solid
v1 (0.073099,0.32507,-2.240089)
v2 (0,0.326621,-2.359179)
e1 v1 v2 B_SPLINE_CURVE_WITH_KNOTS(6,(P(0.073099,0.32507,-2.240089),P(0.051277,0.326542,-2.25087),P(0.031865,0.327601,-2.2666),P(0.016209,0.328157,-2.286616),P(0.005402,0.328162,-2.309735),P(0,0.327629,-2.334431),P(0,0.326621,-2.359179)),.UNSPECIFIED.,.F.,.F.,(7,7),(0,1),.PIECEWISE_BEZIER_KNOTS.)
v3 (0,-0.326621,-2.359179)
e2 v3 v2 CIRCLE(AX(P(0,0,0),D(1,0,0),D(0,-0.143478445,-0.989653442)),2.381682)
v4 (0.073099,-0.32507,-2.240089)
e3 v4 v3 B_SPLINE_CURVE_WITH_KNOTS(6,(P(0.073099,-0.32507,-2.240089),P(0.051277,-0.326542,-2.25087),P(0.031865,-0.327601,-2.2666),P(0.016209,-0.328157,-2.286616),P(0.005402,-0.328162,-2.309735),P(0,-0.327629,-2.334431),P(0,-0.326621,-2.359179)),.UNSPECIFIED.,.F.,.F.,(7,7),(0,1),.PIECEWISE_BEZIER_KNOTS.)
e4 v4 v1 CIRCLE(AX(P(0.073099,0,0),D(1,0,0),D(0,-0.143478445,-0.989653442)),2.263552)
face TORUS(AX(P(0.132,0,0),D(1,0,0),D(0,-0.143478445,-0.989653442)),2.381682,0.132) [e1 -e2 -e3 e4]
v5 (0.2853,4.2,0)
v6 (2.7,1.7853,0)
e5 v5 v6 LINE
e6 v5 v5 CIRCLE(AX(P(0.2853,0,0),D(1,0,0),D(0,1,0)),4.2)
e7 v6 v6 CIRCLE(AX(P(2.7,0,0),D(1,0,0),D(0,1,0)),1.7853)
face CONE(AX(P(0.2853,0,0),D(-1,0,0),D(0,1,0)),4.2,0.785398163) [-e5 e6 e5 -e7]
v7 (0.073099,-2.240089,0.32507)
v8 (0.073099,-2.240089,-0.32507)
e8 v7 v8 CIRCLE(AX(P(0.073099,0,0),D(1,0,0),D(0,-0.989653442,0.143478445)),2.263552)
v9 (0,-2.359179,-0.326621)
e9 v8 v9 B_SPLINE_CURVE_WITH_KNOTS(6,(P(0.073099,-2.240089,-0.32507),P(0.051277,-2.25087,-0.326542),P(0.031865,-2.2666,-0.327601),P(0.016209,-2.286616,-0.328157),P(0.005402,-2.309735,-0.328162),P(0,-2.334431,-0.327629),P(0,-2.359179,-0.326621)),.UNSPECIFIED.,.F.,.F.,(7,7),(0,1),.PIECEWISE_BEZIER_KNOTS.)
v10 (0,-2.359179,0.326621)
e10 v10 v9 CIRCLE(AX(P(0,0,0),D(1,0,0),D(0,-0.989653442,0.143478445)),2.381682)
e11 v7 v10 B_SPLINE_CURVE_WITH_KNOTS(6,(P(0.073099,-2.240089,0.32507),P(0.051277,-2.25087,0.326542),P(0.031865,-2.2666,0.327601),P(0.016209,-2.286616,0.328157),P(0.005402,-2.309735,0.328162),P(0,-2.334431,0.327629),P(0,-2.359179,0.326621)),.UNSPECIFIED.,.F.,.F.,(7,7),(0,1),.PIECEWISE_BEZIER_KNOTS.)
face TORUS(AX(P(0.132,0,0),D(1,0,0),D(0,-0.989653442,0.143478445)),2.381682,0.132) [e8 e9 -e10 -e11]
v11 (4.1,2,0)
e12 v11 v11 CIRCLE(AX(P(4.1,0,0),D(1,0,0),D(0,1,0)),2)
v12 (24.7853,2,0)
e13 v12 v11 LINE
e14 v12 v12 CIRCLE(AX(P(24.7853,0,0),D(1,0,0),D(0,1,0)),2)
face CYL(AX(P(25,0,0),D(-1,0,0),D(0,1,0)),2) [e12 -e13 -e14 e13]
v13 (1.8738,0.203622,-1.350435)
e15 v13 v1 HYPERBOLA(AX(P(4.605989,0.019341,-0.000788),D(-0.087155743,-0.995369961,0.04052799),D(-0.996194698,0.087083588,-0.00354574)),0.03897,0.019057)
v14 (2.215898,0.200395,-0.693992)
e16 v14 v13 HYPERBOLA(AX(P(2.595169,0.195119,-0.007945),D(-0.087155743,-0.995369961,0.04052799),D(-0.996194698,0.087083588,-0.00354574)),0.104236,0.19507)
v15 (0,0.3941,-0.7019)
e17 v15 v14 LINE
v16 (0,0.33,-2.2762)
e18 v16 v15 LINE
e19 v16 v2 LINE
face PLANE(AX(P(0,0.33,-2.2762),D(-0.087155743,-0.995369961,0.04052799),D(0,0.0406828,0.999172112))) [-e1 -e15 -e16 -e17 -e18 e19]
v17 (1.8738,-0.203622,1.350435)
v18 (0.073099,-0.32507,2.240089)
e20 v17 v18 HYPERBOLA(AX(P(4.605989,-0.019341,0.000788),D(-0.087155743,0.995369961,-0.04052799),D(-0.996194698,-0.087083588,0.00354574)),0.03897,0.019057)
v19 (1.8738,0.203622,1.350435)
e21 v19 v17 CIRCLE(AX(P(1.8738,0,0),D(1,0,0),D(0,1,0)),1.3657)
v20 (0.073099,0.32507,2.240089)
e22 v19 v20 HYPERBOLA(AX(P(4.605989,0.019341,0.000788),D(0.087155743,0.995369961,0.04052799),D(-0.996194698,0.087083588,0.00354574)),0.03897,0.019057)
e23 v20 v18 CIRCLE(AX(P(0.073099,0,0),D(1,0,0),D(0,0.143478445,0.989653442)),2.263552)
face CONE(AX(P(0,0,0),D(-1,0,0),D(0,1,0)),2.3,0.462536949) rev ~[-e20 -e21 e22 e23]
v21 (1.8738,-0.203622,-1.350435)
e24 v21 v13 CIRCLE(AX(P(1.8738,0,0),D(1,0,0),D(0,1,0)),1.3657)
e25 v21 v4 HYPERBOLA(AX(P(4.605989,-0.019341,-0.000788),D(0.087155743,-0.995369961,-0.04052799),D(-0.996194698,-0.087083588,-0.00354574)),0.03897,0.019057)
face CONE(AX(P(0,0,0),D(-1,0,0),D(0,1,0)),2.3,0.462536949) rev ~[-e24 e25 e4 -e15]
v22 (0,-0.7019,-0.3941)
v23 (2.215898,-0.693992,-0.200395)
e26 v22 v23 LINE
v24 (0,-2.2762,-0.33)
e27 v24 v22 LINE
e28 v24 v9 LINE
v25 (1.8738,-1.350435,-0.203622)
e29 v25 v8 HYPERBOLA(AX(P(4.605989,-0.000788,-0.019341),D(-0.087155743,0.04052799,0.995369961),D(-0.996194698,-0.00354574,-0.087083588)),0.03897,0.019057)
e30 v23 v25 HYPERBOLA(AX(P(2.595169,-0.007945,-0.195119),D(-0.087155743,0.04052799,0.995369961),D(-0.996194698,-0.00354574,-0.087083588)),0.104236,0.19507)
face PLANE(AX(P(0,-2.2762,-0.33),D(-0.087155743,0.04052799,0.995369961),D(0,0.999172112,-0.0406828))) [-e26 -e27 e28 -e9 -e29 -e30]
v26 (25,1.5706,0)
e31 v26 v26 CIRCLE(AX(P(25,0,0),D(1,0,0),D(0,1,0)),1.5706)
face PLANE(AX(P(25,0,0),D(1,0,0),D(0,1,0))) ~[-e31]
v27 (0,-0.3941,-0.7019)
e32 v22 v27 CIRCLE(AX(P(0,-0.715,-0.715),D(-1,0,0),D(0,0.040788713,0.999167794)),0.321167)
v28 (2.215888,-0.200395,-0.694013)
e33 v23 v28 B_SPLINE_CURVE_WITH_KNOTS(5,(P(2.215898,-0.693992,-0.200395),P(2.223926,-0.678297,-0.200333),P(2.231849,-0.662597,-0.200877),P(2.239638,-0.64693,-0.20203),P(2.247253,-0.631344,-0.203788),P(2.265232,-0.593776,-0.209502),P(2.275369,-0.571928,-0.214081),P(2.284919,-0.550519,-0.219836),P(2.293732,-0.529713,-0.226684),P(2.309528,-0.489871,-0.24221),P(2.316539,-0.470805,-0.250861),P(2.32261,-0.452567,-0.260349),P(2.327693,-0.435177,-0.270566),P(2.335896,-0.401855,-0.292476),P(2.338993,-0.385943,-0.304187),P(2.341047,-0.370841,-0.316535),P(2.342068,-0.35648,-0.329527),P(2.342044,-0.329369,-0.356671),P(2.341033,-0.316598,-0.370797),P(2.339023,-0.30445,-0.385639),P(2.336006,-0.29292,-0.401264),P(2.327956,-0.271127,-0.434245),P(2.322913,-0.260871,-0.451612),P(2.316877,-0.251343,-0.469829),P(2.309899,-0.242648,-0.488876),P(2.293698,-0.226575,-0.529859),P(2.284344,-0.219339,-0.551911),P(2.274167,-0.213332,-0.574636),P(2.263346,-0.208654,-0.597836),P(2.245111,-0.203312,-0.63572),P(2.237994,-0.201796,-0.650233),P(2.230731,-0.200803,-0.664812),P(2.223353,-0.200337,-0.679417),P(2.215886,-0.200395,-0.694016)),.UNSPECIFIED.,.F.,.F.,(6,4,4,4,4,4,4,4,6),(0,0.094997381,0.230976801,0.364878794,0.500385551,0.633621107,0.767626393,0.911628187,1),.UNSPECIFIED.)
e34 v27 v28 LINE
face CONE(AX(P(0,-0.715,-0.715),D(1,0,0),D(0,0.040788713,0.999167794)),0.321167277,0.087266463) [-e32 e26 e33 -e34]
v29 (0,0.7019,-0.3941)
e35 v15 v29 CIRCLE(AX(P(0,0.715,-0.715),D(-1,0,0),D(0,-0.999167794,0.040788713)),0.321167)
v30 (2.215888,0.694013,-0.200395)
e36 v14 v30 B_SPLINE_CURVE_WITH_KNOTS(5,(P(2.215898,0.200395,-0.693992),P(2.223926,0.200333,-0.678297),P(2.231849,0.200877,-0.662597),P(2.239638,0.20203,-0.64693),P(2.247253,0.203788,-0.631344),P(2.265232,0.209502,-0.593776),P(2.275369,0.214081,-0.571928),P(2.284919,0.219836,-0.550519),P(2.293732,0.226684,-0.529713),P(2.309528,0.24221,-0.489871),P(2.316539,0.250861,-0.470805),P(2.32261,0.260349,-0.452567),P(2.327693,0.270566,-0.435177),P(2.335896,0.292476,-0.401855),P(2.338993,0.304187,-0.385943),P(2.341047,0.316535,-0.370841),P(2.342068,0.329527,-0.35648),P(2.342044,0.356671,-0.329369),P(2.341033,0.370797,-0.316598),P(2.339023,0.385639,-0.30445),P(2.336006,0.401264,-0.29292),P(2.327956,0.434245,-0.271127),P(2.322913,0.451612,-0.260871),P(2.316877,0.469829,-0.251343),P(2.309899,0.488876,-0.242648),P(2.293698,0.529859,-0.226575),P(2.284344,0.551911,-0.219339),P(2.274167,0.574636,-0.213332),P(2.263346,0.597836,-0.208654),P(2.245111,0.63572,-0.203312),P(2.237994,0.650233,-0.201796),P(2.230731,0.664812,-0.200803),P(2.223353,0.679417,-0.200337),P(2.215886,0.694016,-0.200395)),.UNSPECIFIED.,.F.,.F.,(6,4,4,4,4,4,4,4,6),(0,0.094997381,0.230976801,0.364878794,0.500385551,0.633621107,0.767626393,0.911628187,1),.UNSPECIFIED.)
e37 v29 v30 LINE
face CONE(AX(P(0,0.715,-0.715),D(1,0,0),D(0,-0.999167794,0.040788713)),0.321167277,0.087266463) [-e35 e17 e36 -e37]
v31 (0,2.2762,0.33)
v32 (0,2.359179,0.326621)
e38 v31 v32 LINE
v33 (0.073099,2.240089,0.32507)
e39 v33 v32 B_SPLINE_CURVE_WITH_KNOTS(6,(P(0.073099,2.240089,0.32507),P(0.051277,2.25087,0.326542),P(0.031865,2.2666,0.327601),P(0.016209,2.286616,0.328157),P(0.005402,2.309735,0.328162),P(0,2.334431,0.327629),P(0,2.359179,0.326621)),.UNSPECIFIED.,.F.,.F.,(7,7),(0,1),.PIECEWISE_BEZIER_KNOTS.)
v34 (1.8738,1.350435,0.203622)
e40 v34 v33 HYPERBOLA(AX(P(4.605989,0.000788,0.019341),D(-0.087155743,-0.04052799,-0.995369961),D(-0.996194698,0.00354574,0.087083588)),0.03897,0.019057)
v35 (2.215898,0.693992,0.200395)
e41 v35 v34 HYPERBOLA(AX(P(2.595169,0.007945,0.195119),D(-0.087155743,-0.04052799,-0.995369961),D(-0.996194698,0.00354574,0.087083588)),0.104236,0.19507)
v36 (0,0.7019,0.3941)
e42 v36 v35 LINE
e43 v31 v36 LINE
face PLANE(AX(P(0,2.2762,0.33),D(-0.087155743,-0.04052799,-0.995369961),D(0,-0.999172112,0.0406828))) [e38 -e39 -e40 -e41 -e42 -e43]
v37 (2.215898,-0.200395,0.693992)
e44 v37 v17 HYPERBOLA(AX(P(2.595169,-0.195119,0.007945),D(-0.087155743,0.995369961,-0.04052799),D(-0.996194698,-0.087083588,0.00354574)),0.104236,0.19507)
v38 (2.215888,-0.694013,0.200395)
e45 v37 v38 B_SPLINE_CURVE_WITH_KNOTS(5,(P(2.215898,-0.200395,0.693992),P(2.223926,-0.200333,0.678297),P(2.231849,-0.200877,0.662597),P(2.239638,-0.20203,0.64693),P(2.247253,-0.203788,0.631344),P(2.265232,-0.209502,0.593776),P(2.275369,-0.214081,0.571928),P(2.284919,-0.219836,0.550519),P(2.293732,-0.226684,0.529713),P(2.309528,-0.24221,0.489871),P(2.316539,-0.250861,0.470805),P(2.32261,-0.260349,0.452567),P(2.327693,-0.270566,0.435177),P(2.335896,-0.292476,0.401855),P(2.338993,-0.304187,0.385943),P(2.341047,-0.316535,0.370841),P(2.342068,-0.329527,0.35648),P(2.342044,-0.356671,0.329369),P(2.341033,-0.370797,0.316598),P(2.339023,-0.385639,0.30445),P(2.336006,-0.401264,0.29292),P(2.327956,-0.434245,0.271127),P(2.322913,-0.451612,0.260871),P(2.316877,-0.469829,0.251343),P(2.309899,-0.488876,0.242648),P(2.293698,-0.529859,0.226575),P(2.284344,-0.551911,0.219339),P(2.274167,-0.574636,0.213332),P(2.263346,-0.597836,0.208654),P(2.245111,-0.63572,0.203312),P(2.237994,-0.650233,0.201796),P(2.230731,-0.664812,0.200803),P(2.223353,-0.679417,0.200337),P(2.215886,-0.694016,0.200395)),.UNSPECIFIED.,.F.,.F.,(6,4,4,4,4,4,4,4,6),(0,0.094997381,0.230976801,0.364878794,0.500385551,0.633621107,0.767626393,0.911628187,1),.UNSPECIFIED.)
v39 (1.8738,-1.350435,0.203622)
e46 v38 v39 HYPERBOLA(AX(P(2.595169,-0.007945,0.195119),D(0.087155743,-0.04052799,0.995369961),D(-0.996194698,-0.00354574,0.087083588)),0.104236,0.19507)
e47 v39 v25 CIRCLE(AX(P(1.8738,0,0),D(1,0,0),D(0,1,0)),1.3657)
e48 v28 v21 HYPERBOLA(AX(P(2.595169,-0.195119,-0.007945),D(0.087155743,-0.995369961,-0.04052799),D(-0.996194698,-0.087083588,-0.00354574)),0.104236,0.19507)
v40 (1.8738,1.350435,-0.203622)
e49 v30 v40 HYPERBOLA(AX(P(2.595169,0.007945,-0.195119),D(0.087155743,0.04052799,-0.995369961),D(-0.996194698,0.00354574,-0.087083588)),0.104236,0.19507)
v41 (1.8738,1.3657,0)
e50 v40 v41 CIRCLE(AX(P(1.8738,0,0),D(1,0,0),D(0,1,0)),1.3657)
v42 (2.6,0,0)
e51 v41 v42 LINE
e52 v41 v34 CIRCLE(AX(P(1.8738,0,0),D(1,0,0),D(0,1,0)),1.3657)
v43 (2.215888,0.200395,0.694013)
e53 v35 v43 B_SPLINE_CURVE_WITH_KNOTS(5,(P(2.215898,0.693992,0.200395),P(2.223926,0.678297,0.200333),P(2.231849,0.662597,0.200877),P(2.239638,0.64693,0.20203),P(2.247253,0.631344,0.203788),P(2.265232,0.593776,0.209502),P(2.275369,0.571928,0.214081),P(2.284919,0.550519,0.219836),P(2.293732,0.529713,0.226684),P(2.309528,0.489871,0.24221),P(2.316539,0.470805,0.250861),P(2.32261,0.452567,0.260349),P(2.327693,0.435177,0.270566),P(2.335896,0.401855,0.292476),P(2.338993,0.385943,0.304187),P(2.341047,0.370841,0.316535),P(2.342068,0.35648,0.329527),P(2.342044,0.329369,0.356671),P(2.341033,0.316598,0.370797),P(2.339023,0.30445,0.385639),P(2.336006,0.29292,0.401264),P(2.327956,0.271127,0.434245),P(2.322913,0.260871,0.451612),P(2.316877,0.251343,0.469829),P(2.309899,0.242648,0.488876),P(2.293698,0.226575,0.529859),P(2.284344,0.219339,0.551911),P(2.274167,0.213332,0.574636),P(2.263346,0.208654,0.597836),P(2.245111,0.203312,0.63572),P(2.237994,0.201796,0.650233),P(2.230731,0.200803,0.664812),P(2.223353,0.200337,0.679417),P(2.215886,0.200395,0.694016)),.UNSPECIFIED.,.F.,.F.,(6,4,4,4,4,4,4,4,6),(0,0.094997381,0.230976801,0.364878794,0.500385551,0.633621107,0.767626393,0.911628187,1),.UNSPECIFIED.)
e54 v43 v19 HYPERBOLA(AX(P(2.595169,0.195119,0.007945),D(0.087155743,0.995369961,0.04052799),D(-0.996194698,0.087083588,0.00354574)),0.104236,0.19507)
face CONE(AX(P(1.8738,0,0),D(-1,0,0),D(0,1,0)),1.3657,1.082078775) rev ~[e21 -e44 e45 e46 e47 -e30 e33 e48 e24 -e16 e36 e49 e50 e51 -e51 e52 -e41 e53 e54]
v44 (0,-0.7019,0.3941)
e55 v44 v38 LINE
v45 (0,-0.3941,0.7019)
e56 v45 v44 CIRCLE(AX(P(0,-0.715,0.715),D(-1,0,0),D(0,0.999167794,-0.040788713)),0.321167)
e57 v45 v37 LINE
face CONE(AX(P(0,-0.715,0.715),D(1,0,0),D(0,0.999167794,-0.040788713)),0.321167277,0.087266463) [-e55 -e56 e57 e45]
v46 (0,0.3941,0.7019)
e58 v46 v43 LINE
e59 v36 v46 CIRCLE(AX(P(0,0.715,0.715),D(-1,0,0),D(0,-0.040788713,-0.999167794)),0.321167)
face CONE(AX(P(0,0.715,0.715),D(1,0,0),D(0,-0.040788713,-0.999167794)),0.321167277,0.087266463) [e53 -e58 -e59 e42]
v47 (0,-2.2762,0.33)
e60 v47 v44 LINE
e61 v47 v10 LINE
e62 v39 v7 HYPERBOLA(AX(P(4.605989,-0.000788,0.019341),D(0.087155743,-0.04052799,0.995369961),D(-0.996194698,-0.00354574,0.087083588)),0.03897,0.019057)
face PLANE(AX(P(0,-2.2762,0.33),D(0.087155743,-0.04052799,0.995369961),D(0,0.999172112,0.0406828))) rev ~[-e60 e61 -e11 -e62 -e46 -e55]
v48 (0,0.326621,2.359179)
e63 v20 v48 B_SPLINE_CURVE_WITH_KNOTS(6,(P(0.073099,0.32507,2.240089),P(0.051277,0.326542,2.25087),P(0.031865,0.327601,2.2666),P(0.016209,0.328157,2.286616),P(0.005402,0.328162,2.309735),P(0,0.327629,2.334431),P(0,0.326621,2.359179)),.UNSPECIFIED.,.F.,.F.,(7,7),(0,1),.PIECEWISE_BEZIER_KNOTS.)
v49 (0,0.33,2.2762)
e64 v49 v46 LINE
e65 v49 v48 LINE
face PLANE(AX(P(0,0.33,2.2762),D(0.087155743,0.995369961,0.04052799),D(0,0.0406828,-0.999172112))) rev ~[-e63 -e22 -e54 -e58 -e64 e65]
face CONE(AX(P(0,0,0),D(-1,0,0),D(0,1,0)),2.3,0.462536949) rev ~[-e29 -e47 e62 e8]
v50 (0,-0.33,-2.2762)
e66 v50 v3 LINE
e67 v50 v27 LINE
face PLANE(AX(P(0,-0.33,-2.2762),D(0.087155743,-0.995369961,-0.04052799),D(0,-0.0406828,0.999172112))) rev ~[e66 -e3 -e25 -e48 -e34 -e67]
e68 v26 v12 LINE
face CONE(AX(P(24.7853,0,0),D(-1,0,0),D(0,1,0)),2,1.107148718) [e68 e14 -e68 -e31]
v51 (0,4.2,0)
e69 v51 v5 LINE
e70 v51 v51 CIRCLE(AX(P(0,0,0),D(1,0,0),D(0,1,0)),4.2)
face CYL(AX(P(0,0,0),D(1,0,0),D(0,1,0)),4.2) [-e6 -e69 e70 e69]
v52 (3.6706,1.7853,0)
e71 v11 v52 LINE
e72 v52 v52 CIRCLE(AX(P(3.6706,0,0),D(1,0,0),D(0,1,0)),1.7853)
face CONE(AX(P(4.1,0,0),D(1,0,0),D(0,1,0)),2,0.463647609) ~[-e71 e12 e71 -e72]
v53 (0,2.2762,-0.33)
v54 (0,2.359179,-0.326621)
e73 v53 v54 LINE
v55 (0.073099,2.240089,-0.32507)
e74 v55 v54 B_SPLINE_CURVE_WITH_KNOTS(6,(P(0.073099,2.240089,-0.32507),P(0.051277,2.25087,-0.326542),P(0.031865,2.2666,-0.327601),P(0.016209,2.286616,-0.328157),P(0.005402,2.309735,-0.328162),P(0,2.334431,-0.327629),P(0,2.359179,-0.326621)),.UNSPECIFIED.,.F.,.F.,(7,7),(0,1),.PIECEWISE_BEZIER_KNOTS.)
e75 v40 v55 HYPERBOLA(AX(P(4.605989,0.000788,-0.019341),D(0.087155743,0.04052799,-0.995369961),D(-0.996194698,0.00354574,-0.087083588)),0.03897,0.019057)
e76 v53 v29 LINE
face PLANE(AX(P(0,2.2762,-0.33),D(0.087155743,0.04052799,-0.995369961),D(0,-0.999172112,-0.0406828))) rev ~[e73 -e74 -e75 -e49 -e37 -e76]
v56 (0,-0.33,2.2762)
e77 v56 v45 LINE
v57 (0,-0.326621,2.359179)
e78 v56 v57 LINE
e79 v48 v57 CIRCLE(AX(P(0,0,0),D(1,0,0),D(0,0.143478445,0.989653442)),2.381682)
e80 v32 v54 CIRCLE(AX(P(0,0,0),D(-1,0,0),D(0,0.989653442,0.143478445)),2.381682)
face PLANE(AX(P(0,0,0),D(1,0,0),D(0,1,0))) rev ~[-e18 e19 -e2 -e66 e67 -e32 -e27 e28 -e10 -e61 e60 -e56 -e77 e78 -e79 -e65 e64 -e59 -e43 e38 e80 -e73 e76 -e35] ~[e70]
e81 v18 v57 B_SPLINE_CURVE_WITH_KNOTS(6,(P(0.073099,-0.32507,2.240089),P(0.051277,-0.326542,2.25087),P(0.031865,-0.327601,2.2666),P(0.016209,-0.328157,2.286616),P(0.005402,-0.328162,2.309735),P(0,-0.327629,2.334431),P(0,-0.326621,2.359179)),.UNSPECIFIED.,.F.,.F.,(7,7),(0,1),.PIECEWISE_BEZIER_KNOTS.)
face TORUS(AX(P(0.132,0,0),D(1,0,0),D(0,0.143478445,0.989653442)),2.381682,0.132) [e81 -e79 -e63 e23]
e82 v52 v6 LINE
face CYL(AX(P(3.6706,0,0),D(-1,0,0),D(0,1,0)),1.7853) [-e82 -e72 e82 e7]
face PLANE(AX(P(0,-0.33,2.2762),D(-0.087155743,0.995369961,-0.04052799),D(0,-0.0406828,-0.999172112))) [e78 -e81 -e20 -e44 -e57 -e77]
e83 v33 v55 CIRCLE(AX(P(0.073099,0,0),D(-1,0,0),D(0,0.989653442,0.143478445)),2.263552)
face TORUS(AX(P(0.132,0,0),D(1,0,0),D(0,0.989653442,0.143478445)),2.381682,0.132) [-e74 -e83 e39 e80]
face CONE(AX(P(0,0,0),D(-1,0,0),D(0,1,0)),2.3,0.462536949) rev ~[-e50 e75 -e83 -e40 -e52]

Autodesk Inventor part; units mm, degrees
ref_plane "YZ Plane" through (0, 0, 0) normal (1, 0, 0) x (0, 1, 0)
ref_plane "XZ Plane" through (0, 0, 0) normal (0, 1, 0) x (-1, 0, 0)
sketch "Sketch1" plane through (0, 0, 0) normal (0, 0, 1) x (1, 0, 0)
  line L0 (2.6, 0) -> (25, 0)
  line L1 (25, 0) -> (25, 2)
  line L2 (25, 2) -> (4.1, 2)
  line L3 (4.1, 2) -> (3.6706, 1.7853)
  line L4 (3.6706, 1.7853) -> (2.7, 1.7853)
  line L5 (0, 4.2) -> (0, 2.3)
  line L6 (0, 2.3) -> (1.8738, 1.3657)
  line L7 (1.8738, 1.3657) -> (2.6, 0)
  line L8 (-5, 0) -> (30, 0) projected
  line L9 (0, -0.84) -> (0, 5.04) projected
  line L10 (0, 4.2) -> (0.2853, 4.2)
  line L11 (0.2853, 4.2) -> (2.7, 1.7853)
  line L12 (4.1, 2) -> (2.4853, 2) construction
  dimension "d1" = 20.9
  dimension "d2" = 4
  dimension "d3" = 3.5706
  dimension "d4" = 4.6
  dimension "d5" = 26.5
  dimension "d6" = 62
  dimension "d7" = 2.6
  dimension "d8" = 0.4294
  dimension "d12" = 8.4
  dimension "d13" = 45
  dimension "d15" = 25
  dimension "d24" = 2.7
revolve "Body" add sketch "Sketch1" angle 360 about axis through (2.6, 0, 0) along (1, 0, 0) contours L7 L6 L5 L10 L11 L4 L3 L2 L1 L0
sketch "Sketch2" plane through (0, 0, 0) normal (-1, 0, 0) x (0, 0, 1)
  line L0 (0, 2.3) -> (0, 0) construction
  line L1 (0, 0) -> (2.3, 0) construction
  arc A0 (0.69, 0) -> (0, 0.69) centre (0, 0) ccw construction
  arc A1 (0.805, 0) -> (0, 0.805) centre (0, 0) ccw construction
  arc A2 (2.2762, 0.33) -> (0.33, 2.2762) centre (0, 0) ccw
  line L2 (0, 0) -> (1.6263, 1.6263) construction
  line L3 (0.33, 2.2762) -> (0.3941, 0.7019)
  line L4 (2.2762, 0.33) -> (0.7019, 0.3941)
  arc A3 (0.33, 2.2762) -> (0, 2.3) centre (0, 0) ccw
  arc A4 (2.3, 0) -> (2.2762, 0.33) centre (0, 0) ccw
  line L5 (0, -5.88) -> (0, 5.88) projected
  line L6 (-5.88, 0) -> (5.88, 0) projected
  arc A5 (0.33, -2.2762) -> (2.2762, -0.33) centre (0, 0) ccw
  line L7 (0.33, -2.2762) -> (0.3941, -0.7019)
  line L8 (2.2762, -0.33) -> (0.7019, -0.3941)
  arc A6 (0, -2.3) -> (0.33, -2.2762) centre (0, 0) ccw
  arc A7 (2.2762, -0.33) -> (2.3, 0) centre (0, 0) ccw
  arc A8 (-0.33, 2.2762) -> (-2.2762, 0.33) centre (0, 0) ccw
  line L9 (-0.33, 2.2762) -> (-0.3941, 0.7019)
  line L10 (-2.2762, 0.33) -> (-0.7019, 0.3941)
  arc A9 (0, 2.3) -> (-0.33, 2.2762) centre (0, 0) ccw
  arc A10 (-2.2762, 0.33) -> (-2.3, 0) centre (0, 0) ccw
  arc A11 (-0.33, -2.2762) -> (0, -2.3) centre (0, 0) ccw
  arc A12 (-2.2762, -0.33) -> (-0.33, -2.2762) centre (0, 0) ccw
  arc A13 (-2.3, 0) -> (-2.2762, -0.33) centre (0, 0) ccw
  line L11 (-2.2762, -0.33) -> (-0.7019, -0.3941)
  line L12 (-0.33, -2.2762) -> (-0.3941, -0.7019)
  arc A14 (0.3941, 0.7019) -> (0.7019, 0.3941) centre (0.715, 0.715) ccw
  arc A15 (0.7019, -0.3941) -> (0.3941, -0.7019) centre (0.715, -0.715) ccw
  arc A16 (-0.7019, 0.3941) -> (-0.3941, 0.7019) centre (-0.715, 0.715) ccw
  arc A17 (-0.3941, -0.7019) -> (-0.7019, -0.3941) centre (-0.715, -0.715) ccw
  point P0 (1.6263, -1.6263)
  point P1 (-1.6263, 1.6263)
  point P2 (-1.6263, -1.6263)
  dimension "d17" = 1.38
  dimension "d18" = 1.61
  dimension "d19" = 4.6
  dimension "d20" = 45
  dimension "d21" = 0.33
extrude "Slot" add sketch "Sketch2" against normal up to next draft 5 contours L4 A14 L3 A2 | A5 L7 A15 L8 | L9 A16 L10 A8 | A12 L11 A17 L12
fillet "Fillet1" radius 0.132 4 edges at (0, 2.3, 0) (0, 0, -2.3) (0, -2.3, 0) (0, 0, 2.3)
thread "Thread" size "M4x0.7" class "6g" standard "ISO Metric profile" length 20.9
chamfer "Chamfer1" distance 0.4294 distance2 0.2147 1 edges at (25, -2, 0) measured on face at (25, -0.9099, 0.3408)
ref_plane "Work Plane2" through (3.35, 0, 0) normal (0, 0, -1) x (1, 0, 0)
equation "\"d1\" = GEL"
equation "\"d2\" = GD"
equation "\"d3\" = BDM"
equation "\"d4\" = SDM"
equation "\"d7\" = INTI"
equation "\"d8\" = GAL"
equation "\"d12\" = KOD"
equation "\"d13\" = 0.5 * SEWI"
equation "\"d15\" = NLG"
equation "\"d24\" = KOH"
equation "\"d17\" = 0.3 * SDM"
equation "\"d18\" = 0.35 * SDM"
equation "\"d19\" = SDM"
equation "\"d21\" = 0.5 * SBR"
equation "\"d23\" = 0.2 * SBR"
equation "\"d10\" = GEL"
equation "\"d25\" = -0.5 * SPD + 0.5 * GD"
equation "\"d26\" = 0.5 * GAL"
equation "\"NLG\" = 25"
equation "\"GEL\" = 20.9"
equation "\"GAL\" = 0.61345 * PTC"
equation "\"SPD\" = NND - 1.2269 * PTC"
equation "\"KOD\" = 8.4"
equation "\"KOH\" = 2.7"
equation "\"SBR\" = 0.66"
equation "\"INTI\" = 2.6"
equation "\"SDM\" = 4.6"
equation "\"GD\" = NND"
equation "\"BDM\" = NND - GAL"
equation "\"SEWI\" = 90deg"
equation "\"d9\" = SDM"
equation "\"GUL\" = 0.61345 * PTC"
equation "\"TOA\" = 30deg"
equation "\"EPV\" = 4.7"
equation "\"THREADDIA\" = 4"
equation "\"PTC\" = 0.7"
equation "\"NND\" = 4"
equation "\"GD1\" = THREADDIA - 1.2269 * PTC"
properties part number "ISO 7046-1 - M4 x 25 - 4.8 - H" material "Steel"
